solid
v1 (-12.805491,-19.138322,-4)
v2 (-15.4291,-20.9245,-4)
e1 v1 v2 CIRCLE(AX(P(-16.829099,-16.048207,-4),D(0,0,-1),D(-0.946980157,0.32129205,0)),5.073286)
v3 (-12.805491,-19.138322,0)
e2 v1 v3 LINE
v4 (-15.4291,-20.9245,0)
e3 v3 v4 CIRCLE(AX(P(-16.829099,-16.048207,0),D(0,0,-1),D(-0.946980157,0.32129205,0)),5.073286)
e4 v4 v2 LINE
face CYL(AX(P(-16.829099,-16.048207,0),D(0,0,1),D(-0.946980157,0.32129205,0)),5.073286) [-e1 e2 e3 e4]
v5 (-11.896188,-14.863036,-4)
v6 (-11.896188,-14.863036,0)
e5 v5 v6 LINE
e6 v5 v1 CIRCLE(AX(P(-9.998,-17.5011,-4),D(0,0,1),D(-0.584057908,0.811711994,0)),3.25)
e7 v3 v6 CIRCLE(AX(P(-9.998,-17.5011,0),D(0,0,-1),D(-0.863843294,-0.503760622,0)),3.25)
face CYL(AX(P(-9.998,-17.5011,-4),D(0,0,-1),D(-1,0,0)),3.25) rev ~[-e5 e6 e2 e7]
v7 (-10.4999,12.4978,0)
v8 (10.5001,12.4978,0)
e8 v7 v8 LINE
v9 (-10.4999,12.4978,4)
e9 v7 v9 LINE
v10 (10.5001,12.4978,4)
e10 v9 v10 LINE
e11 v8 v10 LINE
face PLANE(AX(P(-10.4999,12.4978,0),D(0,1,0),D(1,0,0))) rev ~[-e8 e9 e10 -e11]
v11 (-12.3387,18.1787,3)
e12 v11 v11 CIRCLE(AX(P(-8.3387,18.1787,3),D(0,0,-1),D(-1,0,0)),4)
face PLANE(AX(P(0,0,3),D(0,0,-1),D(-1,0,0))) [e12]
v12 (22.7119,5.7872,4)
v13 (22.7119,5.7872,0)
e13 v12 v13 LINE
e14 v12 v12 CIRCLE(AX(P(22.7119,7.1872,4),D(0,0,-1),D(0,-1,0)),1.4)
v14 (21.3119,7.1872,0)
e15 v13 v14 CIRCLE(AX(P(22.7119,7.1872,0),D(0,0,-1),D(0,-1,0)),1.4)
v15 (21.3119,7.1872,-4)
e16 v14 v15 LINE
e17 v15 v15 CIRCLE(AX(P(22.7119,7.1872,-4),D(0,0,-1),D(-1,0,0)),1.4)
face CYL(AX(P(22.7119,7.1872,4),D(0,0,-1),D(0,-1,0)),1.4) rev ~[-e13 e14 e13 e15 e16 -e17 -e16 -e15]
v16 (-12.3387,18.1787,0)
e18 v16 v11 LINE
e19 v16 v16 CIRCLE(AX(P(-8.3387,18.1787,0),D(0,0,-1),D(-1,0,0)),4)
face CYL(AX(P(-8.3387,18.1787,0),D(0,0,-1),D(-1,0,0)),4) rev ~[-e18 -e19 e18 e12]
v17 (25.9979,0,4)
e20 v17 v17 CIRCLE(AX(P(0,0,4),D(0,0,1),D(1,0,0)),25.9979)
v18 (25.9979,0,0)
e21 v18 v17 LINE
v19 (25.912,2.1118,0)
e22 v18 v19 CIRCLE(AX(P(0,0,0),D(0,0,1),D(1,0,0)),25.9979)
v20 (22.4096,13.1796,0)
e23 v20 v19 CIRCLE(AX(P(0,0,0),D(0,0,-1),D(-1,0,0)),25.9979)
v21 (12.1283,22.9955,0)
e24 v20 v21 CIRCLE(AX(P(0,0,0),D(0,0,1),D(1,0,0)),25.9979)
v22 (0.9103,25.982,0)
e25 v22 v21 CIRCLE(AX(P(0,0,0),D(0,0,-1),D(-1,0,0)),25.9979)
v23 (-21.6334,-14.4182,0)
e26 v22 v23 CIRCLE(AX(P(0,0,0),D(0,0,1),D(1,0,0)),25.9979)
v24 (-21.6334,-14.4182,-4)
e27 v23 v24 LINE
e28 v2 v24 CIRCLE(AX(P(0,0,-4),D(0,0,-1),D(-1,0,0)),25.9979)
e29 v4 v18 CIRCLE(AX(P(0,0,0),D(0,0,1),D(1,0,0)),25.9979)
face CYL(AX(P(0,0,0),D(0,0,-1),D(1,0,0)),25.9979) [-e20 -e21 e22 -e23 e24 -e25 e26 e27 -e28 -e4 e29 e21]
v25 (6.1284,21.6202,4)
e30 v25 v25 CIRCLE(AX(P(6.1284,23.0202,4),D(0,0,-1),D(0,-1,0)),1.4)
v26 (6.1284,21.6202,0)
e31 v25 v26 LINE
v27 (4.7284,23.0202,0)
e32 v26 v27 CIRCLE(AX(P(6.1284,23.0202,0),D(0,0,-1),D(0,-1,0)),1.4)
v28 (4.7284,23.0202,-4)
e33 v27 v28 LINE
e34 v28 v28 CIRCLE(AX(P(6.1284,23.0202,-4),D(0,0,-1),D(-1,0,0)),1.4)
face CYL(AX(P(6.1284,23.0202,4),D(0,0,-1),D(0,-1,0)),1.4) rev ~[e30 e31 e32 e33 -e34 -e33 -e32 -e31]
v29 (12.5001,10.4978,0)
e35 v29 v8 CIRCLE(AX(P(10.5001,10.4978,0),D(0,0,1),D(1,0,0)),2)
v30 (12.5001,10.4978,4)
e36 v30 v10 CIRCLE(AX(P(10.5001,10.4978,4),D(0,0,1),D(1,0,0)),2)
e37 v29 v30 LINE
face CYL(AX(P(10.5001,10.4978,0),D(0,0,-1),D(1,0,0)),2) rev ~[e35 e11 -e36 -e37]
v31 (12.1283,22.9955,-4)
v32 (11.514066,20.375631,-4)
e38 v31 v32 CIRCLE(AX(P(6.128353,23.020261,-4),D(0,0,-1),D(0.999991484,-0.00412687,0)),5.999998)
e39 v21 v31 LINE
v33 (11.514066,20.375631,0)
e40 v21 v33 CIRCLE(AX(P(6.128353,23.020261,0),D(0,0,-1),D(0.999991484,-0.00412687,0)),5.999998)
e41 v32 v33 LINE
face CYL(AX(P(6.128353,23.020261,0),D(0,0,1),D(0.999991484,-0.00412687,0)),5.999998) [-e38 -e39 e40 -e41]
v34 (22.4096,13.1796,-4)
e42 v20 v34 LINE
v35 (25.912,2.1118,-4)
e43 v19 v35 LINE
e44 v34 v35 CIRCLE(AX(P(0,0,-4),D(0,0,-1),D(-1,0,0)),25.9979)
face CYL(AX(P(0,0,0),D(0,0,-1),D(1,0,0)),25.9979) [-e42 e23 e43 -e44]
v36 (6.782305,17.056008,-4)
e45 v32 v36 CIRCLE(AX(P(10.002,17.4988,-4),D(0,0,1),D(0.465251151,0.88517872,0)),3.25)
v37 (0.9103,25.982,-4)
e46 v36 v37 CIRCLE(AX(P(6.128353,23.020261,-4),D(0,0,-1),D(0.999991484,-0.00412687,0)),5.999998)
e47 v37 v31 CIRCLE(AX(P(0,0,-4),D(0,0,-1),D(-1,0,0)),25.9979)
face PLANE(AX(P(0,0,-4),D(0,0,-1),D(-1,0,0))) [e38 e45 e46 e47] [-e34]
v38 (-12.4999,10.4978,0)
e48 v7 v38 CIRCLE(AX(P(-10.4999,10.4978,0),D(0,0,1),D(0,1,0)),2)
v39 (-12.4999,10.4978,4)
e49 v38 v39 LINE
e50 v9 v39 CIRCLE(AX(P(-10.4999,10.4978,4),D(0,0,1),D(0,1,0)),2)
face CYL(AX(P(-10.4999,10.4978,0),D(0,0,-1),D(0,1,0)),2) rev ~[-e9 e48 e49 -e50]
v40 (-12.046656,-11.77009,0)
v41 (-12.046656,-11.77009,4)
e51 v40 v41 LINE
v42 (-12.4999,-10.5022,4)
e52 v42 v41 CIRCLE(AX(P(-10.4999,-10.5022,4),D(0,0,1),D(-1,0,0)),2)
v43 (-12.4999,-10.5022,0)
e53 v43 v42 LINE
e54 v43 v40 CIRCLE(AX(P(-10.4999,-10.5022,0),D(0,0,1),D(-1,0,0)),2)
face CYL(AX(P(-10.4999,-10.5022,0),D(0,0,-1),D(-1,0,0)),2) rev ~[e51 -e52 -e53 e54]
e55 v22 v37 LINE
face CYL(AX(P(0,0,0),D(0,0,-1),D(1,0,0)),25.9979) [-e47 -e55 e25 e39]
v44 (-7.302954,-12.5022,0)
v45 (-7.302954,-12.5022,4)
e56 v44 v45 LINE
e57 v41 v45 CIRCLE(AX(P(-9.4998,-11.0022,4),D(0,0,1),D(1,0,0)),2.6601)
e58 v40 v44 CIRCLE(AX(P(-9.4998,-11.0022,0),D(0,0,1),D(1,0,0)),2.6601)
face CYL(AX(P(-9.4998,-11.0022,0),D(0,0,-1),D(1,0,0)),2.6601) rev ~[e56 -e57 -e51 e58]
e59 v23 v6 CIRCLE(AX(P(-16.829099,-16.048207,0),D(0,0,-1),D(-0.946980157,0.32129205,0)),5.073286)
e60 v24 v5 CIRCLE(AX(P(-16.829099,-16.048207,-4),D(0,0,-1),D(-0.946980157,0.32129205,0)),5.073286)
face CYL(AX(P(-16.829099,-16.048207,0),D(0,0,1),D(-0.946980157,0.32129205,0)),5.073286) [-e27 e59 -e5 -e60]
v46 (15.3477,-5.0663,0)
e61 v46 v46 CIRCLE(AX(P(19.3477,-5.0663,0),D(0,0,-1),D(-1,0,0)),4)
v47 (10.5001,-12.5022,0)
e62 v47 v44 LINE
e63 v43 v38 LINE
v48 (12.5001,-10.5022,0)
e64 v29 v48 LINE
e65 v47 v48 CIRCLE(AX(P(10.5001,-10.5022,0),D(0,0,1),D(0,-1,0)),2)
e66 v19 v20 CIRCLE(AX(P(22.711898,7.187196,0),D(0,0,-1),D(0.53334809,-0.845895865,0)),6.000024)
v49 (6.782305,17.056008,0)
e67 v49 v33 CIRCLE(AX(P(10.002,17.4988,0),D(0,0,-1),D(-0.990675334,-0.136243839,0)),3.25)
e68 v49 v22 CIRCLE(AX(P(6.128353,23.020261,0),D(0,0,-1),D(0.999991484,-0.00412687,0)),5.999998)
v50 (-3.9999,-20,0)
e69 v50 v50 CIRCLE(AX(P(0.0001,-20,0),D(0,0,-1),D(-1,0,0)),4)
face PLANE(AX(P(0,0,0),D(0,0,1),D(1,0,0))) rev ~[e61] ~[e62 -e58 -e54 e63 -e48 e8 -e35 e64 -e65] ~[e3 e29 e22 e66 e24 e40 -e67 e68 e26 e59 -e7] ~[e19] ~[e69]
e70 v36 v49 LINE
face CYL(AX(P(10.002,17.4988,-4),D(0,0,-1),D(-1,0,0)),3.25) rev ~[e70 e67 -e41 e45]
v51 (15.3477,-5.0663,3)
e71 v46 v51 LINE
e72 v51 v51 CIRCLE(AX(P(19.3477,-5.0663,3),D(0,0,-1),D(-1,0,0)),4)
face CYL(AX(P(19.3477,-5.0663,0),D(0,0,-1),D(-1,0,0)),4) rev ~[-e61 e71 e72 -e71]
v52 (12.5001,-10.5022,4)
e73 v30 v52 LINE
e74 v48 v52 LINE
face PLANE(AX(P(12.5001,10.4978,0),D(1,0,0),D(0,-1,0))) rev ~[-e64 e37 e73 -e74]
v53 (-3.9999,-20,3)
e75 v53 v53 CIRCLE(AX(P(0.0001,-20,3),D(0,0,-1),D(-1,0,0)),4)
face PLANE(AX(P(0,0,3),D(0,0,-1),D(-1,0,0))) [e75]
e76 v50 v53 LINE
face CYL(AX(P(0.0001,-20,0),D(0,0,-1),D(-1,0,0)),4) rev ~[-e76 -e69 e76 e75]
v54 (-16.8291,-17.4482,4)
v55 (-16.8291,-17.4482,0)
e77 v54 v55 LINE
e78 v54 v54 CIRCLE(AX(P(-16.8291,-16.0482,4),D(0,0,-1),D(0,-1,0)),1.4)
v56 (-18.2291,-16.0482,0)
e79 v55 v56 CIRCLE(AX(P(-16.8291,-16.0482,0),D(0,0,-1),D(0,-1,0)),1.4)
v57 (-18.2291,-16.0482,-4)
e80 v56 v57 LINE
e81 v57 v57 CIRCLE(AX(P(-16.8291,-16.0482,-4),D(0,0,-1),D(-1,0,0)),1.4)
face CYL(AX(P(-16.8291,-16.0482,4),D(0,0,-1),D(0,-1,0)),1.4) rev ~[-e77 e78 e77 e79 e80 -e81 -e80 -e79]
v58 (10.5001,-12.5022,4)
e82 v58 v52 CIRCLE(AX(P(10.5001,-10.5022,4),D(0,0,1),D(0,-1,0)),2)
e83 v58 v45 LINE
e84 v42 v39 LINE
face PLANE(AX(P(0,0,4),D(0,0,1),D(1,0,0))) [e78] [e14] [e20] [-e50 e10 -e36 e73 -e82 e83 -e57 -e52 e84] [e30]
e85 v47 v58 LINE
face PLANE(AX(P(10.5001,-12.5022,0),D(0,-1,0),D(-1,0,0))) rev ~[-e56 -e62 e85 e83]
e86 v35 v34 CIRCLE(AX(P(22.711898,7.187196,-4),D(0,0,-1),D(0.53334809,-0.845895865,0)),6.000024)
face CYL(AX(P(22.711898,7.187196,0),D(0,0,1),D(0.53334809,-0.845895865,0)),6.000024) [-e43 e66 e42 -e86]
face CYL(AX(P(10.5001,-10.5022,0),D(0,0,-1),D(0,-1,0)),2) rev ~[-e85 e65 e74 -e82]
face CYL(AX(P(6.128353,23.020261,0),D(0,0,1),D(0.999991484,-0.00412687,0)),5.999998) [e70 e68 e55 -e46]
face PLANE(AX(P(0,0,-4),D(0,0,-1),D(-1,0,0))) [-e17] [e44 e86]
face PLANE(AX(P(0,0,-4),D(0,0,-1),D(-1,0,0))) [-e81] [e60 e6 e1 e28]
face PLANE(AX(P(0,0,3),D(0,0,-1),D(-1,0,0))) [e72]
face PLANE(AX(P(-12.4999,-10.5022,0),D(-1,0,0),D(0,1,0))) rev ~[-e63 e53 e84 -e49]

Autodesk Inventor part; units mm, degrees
ref_plane "YZ Plane" through (0, 0, 0) normal (1, 0, 0) x (0, 1, 0)
ref_plane "XZ Plane" through (0, 0, 0) normal (0, 1, 0) x (-1, 0, 0)
ref_plane "XY Plane" through (0, 0, 0) normal (0, 0, 1) x (1, 0, 0)
ref_plane "Work Plane1" through (0, 0, 0) normal (0, 0, 1) x (1, 0, 0)
sketch "Sketch1" plane through (0, 0, 0) normal (0, 0, 1) x (1, 0, 0)
  circle A0 centre (0, 0) radius 25.9979 projected
  circle A1 centre (-9.4998, -11.0022) radius 2.6601 projected
  circle A2 centre (0.0001, -0.0022) radius 3.8801 projected
  circle A3 centre (0.0001, -0.0022) radius 6.7754 projected
  line L0 (10.5001, -12.5022) -> (-10.4999, -12.5022)
  line L1 (-12.4999, -10.5022) -> (-12.4999, 10.4978)
  line L2 (-10.4999, 12.4978) -> (10.5001, 12.4978)
  line L3 (12.5001, 10.4978) -> (12.5001, -10.5022)
  line L4 (12.5001, -12.5022) -> (-12.4999, 12.4978) construction
  line L5 (-12.4999, -12.5022) -> (12.5001, 12.4978) construction
  arc A4 (-10.4999, 12.4978) -> (-12.4999, 10.4978) centre (-10.4999, 10.4978) ccw
  arc A5 (-12.4999, -10.5022) -> (-10.4999, -12.5022) centre (-10.4999, -10.5022) ccw
  arc A6 (10.5001, -12.5022) -> (12.5001, -10.5022) centre (10.5001, -10.5022) ccw
  arc A7 (12.5001, 10.4978) -> (10.5001, 12.4978) centre (10.5001, 10.4978) ccw
  point P0 (0, 0)
  point P1 (-7.3029, -12.5022)
  point P2 (-12.0467, -11.77)
  dimension "d17" = 25
  dimension "d18" = 25
  dimension "d19" = 2
extrude "Extrusion1" add sketch "Sketch1" along normal blind 4 contours A0
sketch "Skizze4" plane through (0, 0, 4) normal (0, 0, 1) x (1, 0, 0)
  spline S0 degree 2 poles (24.1427, 2.2394) (24.731, 1.8489) (25.3785, 0.5587) (25.3785, -0.3311) knots 0 0 0 1 2 2 2 construction
  spline S1 degree 2 poles (25.3785, -0.3311) (25.3785, -1.1665) (24.7013, -2.5111) (24.1328, -2.8867) knots 0 0 0 1 2 2 2 construction
  spline S2 degree 2 poles (24.1328, -2.8867) (23.6682, -3.1784) (22.7141, -3.3761) (21.9726, -3.3761) knots 0 0 0 1 2 2 2 construction
  line L0 (21.9726, -3.3761) -> (20.5687, -3.3761) construction
  line L1 (20.5687, -3.3761) -> (20.5687, 2.7239) construction
  line L2 (20.5687, 2.7239) -> (21.9578, 2.7239) construction
  spline S3 degree 2 poles (21.9578, 2.7239) (22.8179, 2.7239) (23.7967, 2.4668) (24.1427, 2.2394) knots 0 0 0 1 2 2 2 construction
  spline S4 degree 2 poles (19.1896, -2.9312) (18.8979, -3.1982) (18.1564, -3.4849) (17.5978, -3.4849) knots 0 0 0 1 2 2 2 construction
  spline S5 degree 2 poles (17.5978, -3.4849) (16.9354, -3.4849) (16.0061, -3.2081) (15.5958, -3.0103) knots 0 0 0 1 2 2 2 construction
  line L3 (15.5958, -3.0103) -> (15.5958, -1.992) construction
  line L4 (15.5958, -1.992) -> (15.6551, -1.992) construction
  spline S6 degree 2 poles (15.6551, -1.992) (16.0555, -2.3677) (17.0689, -2.7829) (17.5385, -2.7829) knots 0 0 0 1 2 2 2 construction
  spline S7 degree 2 poles (17.5385, -2.7829) (18.2108, -2.7829) (18.8979, -2.2243) (18.8979, -1.7646) knots 0 0 0 1 2 2 2 construction
  spline S8 degree 2 poles (18.8979, -1.7646) (18.8979, -1.3988) (18.5371, -0.944) (18.1465, -0.8303) knots 0 0 0 1 2 2 2 construction
  spline S9 degree 2 poles (18.1465, -0.8303) (17.8648, -0.7513) (17.3952, -0.6425) (17.0442, -0.5535) knots 0 0 0 1 2 2 2 construction
  spline S10 degree 2 poles (17.0442, -0.5535) (16.7278, -0.4695) (16.2285, -0.2174) (16.0358, -0.0147) knots 0 0 0 1 2 2 2 construction
  spline S11 degree 2 poles (16.0358, -0.0147) (15.8479, 0.188) (15.6403, 0.7317) (15.6403, 1.0876) knots 0 0 0 1 2 2 2 construction
  spline S12 degree 2 poles (15.6403, 1.0876) (15.6403, 1.8291) (16.797, 2.8326) (17.6918, 2.8326) knots 0 0 0 1 2 2 2 construction
  spline S13 degree 2 poles (17.6918, 2.8326) (18.2059, 2.8326) (19.1154, 2.6299) (19.5059, 2.4372) knots 0 0 0 1 2 2 2 construction
  line L5 (19.5059, 2.4372) -> (19.5059, 1.4683) construction
  line L6 (19.5059, 1.4683) -> (19.4466, 1.4683) construction
  spline S14 degree 2 poles (19.4466, 1.4683) (19.155, 1.7352) (18.2454, 2.1307) (17.7461, 2.1307) knots 0 0 0 1 2 2 2 construction
  spline S15 degree 2 poles (17.7461, 2.1307) (17.1826, 2.1307) (16.4856, 1.6017) (16.4856, 1.1717) knots 0 0 0 1 2 2 2 construction
  spline S16 degree 2 poles (16.4856, 1.1717) (16.4856, 0.7861) (16.8959, 0.3264) (17.2815, 0.2226) knots 0 0 0 1 2 2 2 construction
  spline S17 degree 2 poles (17.2815, 0.2226) (17.5385, 0.1534) (18.285, -0.0246) (18.5321, -0.0987) knots 0 0 0 1 2 2 2 construction
  spline S18 degree 2 poles (18.5321, -0.0987) (19.1599, -0.2915) (19.7432, -1.0676) (19.7432, -1.6361) knots 0 0 0 1 2 2 2 construction
  spline S19 degree 2 poles (19.7432, -1.6361) (19.7432, -1.997) (19.4516, -2.689) (19.1896, -2.9312) knots 0 0 0 1 2 2 2 construction
  circle A0 centre (-9.9998, 17.4978) radius 1.3999 construction
  circle A1 centre (10.0001, 17.4979) radius 1.4 construction
  circle A2 centre (10.0001, -17.5021) radius 1.4 construction
  circle A3 centre (-9.9998, -17.5021) radius 1.4001 construction
  arc A4 (-25.1198, 6.6998) -> (-24.1417, 5.4917) centre (-24.1417, 6.4917) ccw construction
  line L7 (-24.1417, 5.4917) -> (-17.7002, 5.4917) construction
  arc A5 (-15.7002, 3.4917) -> (-17.7002, 5.4917) centre (-17.7002, 3.4917) ccw construction
  line L8 (-15.7002, 3.4917) -> (-15.7002, -4.496) construction
  arc A6 (-17.7002, -6.496) -> (-15.7002, -4.496) centre (-17.7002, -4.496) ccw construction
  line L9 (-17.7002, -6.496) -> (-23.8502, -6.496) construction
  arc A7 (-23.8502, -6.496) -> (-24.8235, -7.7254) centre (-23.8502, -7.496) ccw construction
  arc A8 (-24.8235, -7.7254) -> (-25.1198, 6.6998) centre (0, 0) ccw construction
  circle A9 centre (-9.4998, -11.0022) radius 2.6601 construction
  circle A10 centre (-16.8291, -16.0482) radius 1.4 construction
  circle A11 centre (6.1284, 23.0202) radius 1.4 construction
  circle A12 centre (22.7119, 7.1872) radius 1.4 construction
  circle A13 centre (0.0001, -0.0022) radius 6.5 construction
  point P0 (0, 0)
hole "Bohrung1" at (6.1284, 23.0202, 4) at (22.7119, 7.1872, 4) at (-16.8291, -16.0482, 4) direction (0, 0, -1) diameter 2.8 end through all
sketch "Skizze6" plane through (0, 0, 0) normal (0, 0, -1) x (-1, 0, 0)
  circle A0 centre (-22.7119, 7.1872) radius 1.4 projected
  circle A1 centre (-6.1284, 23.0202) radius 1.4 projected
  circle A2 centre (16.8291, -16.0482) radius 1.4 projected
  circle A3 centre (0, 0) radius 25.9979 projected
  line L0 (12.4999, -10.5022) -> (12.4999, 10.4978) projected
  arc A4 (12.0467, -11.77) -> (12.4999, -10.5022) centre (10.4999, -10.5022) ccw projected
  arc A5 (7.3029, -12.5022) -> (12.0467, -11.77) centre (9.4998, -11.0022) ccw projected
  line L1 (-10.5001, -12.5022) -> (7.3029, -12.5022) projected
  arc A6 (-12.5001, -10.5022) -> (-10.5001, -12.5022) centre (-10.5001, -10.5022) ccw projected
  line L2 (-12.5001, 10.4978) -> (-12.5001, -10.5022) projected
  arc A7 (-10.5001, 12.4978) -> (-12.5001, 10.4978) centre (-10.5001, 10.4978) ccw projected
  line L3 (10.4999, 12.4978) -> (-10.5001, 12.4978) projected
  arc A8 (12.4999, 10.4978) -> (10.4999, 12.4978) centre (10.4999, 10.4978) ccw projected
  arc A9 (21.6334, -14.4182) -> (15.4291, -20.9245) centre (16.8291, -16.0482) ccw
  circle A10 centre (-6.1284, 23.0202) radius 1.4 projected
  circle A11 centre (0, 0) radius 25.9979 projected
  arc A12 (-12.1283, 22.9955) -> (-0.9103, 25.982) centre (-6.1284, 23.0202) ccw
  circle A13 centre (-22.7119, 7.1872) radius 1.4 projected
  arc A14 (-25.912, 2.1118) -> (-22.4096, 13.1796) centre (-22.7119, 7.1872) ccw
  point P0 (0, 0)
  point P1 (-25.912, 2.1118)
  point P2 (-0.9103, 25.982)
  dimension "d20" = 6
  dimension "d21" = 6
extrude "Extrusion4" add sketch "Skizze6" along normal blind 4 contours A12 A3 | A3 A9 | A14 A3
sketch "Skizze7" plane through (0, 0, 0) normal (0, 0, -1) x (-1, 0, 0)
  arc A0 (-25.912, 2.1118) -> (-22.4096, 13.1796) centre (-22.7119, 7.1872) ccw projected
  arc A1 (-25.912, 2.1118) -> (15.4291, -20.9245) centre (0, 0) ccw projected
  arc A2 (21.6334, -14.4182) -> (15.4291, -20.9245) centre (16.8291, -16.0482) ccw projected
  arc A3 (21.6334, -14.4182) -> (-0.9103, 25.982) centre (0, 0) ccw projected
  arc A4 (-12.1283, 22.9955) -> (-0.9103, 25.982) centre (-6.1284, 23.0202) ccw projected
  arc A5 (-12.1283, 22.9955) -> (-22.4096, 13.1796) centre (0, 0) ccw projected
  line L0 (12.4999, -10.5022) -> (12.4999, 10.4978) projected
  arc A6 (12.0467, -11.77) -> (12.4999, -10.5022) centre (10.4999, -10.5022) ccw projected
  arc A7 (7.3029, -12.5022) -> (12.0467, -11.77) centre (9.4998, -11.0022) ccw projected
  line L1 (-10.5001, -12.5022) -> (7.3029, -12.5022) projected
  arc A8 (-12.5001, -10.5022) -> (-10.5001, -12.5022) centre (-10.5001, -10.5022) ccw projected
  line L2 (-12.5001, 10.4978) -> (-12.5001, -10.5022) projected
  arc A9 (-10.5001, 12.4978) -> (-12.5001, 10.4978) centre (-10.5001, 10.4978) ccw projected
  line L3 (10.4999, 12.4978) -> (-10.5001, 12.4978) projected
  arc A10 (12.4999, 10.4978) -> (10.4999, 12.4978) centre (10.4999, 10.4978) ccw projected
  circle A11 centre (8.3387, 18.1787) radius 4
  circle A12 centre (-0.0001, -20) radius 4
  circle A13 centre (-19.3477, -5.0663) radius 4
  circle A14 centre (0, 0) radius 20 construction
  point P0 (0, 0)
  dimension "d24" = 8
  dimension "d25" = 8
  dimension "d26" = 8
  dimension "d29" = 40
extrude "Extrusion5" cut sketch "Skizze7" against normal blind 3 contours A11 | A12 | A13
sketch "Skizze8" plane through (0, 0, -4) normal (0, 0, -1) x (-1, 0, 0)
  circle A0 centre (16.8271, -16.0472) radius 2.75 projected
  circle A1 centre (-22.7139, 7.1882) radius 2.75 projected
  circle A2 centre (-6.1303, 23.0212) radius 2.75 projected
  circle A3 centre (-6.1303, 23.0212) radius 3.25
  circle A4 centre (-22.7139, 7.1882) radius 3.25
  circle A5 centre (16.8271, -16.0472) radius 3.25
  circle A6 centre (-10.002, -17.5012) radius 2.75 projected
  circle A7 centre (9.998, -17.5011) radius 2.75 projected
  circle A8 centre (-10.002, 17.4988) radius 2.75 projected
  circle A9 centre (-10.002, 17.4988) radius 3.25
  circle A10 centre (-10.002, -17.5012) radius 3.25
  circle A11 centre (9.998, -17.5011) radius 3.25
  point P0 (0, 0)
  dimension "d30" = 0.5
  dimension "d31" = 0.5
  dimension "d32" = 0.5
  dimension "d33" = 0.5
  dimension "d34" = 0.5
  dimension "d35" = 0.5
extrude "Extrusion6" cut sketch "Skizze8" against normal up to surface (4 mm away) contours A6 | A7 | A8 | A9 | A10 | A11
properties part number "Anglerfish_flipped_LidMoun"
